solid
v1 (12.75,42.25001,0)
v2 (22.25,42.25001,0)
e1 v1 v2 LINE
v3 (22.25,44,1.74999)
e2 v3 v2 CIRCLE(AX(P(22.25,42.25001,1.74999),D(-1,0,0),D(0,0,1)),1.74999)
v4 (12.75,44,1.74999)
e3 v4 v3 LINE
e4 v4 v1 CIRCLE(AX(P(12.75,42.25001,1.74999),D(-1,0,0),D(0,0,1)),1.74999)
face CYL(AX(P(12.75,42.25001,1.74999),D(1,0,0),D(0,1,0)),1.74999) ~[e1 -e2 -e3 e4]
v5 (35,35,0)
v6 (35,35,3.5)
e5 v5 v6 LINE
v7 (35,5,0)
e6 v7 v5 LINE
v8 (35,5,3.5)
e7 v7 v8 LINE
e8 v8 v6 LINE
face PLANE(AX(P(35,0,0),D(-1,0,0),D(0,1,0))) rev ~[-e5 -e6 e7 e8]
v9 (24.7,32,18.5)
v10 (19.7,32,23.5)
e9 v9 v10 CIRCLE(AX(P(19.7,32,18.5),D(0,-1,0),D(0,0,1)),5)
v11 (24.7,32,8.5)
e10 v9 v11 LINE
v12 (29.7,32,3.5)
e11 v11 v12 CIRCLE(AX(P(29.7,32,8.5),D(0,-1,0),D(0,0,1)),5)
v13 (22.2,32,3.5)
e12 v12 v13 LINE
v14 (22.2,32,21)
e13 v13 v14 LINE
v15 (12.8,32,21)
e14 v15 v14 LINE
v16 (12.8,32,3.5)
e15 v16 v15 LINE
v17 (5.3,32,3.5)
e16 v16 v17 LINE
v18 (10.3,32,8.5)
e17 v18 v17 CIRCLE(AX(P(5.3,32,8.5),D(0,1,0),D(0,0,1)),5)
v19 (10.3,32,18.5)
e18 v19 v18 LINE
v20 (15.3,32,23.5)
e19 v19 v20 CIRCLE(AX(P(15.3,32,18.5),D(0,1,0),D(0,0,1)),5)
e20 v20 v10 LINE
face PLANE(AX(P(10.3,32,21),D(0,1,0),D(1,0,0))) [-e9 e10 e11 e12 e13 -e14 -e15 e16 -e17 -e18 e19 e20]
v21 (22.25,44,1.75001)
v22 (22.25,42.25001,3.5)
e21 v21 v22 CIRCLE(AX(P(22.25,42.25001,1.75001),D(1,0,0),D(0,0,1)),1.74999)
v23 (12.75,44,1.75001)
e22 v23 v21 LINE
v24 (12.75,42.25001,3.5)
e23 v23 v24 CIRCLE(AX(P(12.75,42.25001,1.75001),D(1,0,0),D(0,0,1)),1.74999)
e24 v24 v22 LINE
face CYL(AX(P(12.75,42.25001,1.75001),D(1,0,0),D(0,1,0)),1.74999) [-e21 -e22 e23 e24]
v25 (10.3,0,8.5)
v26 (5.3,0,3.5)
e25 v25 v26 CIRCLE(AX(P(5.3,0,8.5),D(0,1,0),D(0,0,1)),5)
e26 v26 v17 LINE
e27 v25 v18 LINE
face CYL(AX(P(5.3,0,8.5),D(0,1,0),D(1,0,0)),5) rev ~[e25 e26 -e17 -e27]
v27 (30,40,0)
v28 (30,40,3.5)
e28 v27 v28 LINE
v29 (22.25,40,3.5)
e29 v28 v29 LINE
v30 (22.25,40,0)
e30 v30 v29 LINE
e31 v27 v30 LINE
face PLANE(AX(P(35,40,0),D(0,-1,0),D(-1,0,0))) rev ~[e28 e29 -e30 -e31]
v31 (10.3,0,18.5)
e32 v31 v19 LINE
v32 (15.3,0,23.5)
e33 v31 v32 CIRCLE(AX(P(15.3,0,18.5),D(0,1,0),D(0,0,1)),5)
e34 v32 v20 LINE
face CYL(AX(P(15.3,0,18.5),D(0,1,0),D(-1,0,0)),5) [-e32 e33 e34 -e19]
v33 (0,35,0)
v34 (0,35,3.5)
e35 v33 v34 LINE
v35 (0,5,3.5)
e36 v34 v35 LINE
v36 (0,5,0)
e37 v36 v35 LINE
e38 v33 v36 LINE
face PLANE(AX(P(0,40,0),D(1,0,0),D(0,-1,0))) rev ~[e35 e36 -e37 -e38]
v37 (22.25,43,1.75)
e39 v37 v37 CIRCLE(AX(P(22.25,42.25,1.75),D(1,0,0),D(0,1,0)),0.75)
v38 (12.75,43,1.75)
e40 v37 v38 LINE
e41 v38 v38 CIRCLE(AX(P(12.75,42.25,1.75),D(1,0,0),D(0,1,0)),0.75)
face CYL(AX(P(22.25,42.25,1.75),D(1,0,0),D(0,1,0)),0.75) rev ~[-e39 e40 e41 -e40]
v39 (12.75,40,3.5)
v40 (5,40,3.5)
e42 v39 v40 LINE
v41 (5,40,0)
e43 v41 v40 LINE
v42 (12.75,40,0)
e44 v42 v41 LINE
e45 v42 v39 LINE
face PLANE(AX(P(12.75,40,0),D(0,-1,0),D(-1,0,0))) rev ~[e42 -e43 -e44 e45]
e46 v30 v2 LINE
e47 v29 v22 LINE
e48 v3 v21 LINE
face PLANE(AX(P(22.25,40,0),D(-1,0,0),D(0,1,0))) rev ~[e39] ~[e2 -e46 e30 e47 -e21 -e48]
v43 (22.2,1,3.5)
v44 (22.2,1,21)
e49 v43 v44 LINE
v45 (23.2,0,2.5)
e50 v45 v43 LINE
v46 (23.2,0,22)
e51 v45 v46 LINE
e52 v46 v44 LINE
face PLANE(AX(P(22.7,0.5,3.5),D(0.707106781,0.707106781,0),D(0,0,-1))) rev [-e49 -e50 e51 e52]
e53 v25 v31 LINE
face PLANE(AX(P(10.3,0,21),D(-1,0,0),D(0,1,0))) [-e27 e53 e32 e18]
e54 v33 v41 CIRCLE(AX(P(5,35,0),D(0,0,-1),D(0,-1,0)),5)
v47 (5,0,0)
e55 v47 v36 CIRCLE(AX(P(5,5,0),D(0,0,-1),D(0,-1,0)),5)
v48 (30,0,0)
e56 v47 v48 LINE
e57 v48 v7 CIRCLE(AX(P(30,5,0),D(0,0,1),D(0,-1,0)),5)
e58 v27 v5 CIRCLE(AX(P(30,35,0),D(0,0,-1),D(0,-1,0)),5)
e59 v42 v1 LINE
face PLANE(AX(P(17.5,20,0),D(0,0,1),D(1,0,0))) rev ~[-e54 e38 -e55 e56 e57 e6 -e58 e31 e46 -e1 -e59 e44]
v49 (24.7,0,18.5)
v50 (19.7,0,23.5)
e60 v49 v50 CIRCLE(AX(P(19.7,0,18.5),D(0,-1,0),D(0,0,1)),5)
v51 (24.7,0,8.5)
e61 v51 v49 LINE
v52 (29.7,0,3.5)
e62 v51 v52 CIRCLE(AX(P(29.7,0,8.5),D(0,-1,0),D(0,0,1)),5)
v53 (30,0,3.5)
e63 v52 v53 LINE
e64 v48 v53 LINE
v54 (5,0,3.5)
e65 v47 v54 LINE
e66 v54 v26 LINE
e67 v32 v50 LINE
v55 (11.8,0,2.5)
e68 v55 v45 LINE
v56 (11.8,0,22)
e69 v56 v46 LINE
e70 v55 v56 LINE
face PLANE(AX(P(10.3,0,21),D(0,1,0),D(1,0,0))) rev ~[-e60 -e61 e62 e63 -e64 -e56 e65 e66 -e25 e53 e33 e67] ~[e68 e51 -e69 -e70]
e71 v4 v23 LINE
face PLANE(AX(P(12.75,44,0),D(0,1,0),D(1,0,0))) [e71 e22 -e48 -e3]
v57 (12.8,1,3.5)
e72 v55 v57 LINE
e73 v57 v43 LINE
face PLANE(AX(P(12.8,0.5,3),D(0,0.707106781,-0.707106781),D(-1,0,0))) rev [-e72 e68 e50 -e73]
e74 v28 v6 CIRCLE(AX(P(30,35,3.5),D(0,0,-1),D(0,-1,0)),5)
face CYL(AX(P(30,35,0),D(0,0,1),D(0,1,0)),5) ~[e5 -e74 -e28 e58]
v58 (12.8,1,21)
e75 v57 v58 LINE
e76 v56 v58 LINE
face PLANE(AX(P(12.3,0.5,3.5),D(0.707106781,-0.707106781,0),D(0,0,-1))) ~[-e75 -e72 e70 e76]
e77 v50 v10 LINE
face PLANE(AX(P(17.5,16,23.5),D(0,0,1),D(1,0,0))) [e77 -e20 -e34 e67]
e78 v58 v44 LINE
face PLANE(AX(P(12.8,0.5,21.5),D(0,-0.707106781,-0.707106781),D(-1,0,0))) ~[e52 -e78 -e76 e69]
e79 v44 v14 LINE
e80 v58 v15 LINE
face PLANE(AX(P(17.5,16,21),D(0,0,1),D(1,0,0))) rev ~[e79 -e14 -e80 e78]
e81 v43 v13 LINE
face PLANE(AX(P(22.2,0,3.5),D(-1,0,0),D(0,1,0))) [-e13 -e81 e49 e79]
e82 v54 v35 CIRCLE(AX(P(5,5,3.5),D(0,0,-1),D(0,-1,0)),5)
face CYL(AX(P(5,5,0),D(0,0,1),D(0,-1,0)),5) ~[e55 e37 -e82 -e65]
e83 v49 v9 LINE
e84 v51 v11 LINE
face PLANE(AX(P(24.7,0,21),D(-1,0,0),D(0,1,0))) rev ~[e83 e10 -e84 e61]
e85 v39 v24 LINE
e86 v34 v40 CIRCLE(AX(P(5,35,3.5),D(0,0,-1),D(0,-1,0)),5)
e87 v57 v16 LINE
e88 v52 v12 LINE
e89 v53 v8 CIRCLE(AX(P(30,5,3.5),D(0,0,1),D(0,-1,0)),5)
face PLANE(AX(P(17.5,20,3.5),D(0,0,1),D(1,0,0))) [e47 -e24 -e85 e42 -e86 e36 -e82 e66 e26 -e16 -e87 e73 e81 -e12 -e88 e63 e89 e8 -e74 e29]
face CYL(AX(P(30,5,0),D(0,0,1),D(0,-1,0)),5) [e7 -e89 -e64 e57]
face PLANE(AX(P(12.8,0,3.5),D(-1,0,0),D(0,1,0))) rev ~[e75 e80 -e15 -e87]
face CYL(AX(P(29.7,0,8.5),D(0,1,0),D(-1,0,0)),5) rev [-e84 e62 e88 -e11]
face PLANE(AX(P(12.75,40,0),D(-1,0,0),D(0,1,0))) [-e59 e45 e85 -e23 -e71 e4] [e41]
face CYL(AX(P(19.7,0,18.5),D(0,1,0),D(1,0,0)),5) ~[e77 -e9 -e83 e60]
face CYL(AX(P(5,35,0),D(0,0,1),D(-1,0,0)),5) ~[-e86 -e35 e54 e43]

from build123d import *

# Parameters (mm, degrees)
F0_W     = 9.5
F0_H     = 4
F1_DEPTH = 3.5
F2_R     = 1.74999
F3_R     = 0.75
F4_DEPTH = 10
F5_W     = 2.5
F5_H     = 32
F6_DEPTH = 17.5
F7_W     = 14.4
F7_H     = 32
F8_DEPTH = 2.5
F9_R     = 5
F10_SIZE = 1


# Not quite as in the source:
# - a fillet or chamfer is up to 0.001 mm smaller than in the source, because OpenCascade refuses the exact size


with BuildPart() as f1:
    # F0 (on Top) → F1 (new body)
    with BuildSketch(Plane.XY):
        Polygon((0, 40), (0, 0), (35, 0), (35, 40), (22.25, 40), (12.75, 40), align=None)
        with Locations((17.5, 42)):
            Rectangle(F0_W, F0_H)
    extrude(amount=F1_DEPTH)

    # F2 (radius 1.75 in the source; OpenCascade refuses exactly that, so slightly less here)
    f2_edges = [f1.edges().sort_by_distance(p)[0] for p in [
        (17.5, 44, 3.5),
        (17.5, 44, 0),
    ]]
    fillet(f2_edges, radius=F2_R)

    # F3 (on face) → F4 (cut)
    with BuildSketch(Plane.YZ.offset(22.25)):
        with Locations((42.25, 1.75)):
            Circle(F3_R)
    extrude(amount=-F4_DEPTH, mode=Mode.SUBTRACT)

    # F5 (on face) → F6 (join)
    with BuildSketch(Plane.XY.offset(3.5)):
        with Locations((11.55, 16)):
            Rectangle(F5_W, F5_H)
        with Locations((23.45, 16)):
            Rectangle(F5_W, F5_H)
    extrude(amount=F6_DEPTH)

    # F7 (on face) → F8 (join)
    with BuildSketch(Plane.XY.offset(21)):
        with Locations((17.5, 16)):
            Rectangle(F7_W, F7_H)
    extrude(amount=F8_DEPTH)

    # F9
    f9_edges = [f1.edges().sort_by_distance(p)[0] for p in [
        (24.7, 16, 23.5),
        (10.3, 16, 23.5),
        (24.7, 16, 3.5),
        (10.3, 16, 3.5),
        (35, 40, 1.75),
        (0, 40, 1.75),
        (0, 0, 1.75),
        (35, 0, 1.75),
    ]]
    fillet(f9_edges, radius=F9_R)

    # F10
    f10_edges = [f1.edges().sort_by_distance(p)[0] for p in [
        (12.8, 0, 12.25),
        (17.5, 0, 3.5),
        (22.2, 0, 12.25),
        (17.5, 0, 21),
    ]]
    chamfer(f10_edges, length=F10_SIZE)


solid = f1.part
